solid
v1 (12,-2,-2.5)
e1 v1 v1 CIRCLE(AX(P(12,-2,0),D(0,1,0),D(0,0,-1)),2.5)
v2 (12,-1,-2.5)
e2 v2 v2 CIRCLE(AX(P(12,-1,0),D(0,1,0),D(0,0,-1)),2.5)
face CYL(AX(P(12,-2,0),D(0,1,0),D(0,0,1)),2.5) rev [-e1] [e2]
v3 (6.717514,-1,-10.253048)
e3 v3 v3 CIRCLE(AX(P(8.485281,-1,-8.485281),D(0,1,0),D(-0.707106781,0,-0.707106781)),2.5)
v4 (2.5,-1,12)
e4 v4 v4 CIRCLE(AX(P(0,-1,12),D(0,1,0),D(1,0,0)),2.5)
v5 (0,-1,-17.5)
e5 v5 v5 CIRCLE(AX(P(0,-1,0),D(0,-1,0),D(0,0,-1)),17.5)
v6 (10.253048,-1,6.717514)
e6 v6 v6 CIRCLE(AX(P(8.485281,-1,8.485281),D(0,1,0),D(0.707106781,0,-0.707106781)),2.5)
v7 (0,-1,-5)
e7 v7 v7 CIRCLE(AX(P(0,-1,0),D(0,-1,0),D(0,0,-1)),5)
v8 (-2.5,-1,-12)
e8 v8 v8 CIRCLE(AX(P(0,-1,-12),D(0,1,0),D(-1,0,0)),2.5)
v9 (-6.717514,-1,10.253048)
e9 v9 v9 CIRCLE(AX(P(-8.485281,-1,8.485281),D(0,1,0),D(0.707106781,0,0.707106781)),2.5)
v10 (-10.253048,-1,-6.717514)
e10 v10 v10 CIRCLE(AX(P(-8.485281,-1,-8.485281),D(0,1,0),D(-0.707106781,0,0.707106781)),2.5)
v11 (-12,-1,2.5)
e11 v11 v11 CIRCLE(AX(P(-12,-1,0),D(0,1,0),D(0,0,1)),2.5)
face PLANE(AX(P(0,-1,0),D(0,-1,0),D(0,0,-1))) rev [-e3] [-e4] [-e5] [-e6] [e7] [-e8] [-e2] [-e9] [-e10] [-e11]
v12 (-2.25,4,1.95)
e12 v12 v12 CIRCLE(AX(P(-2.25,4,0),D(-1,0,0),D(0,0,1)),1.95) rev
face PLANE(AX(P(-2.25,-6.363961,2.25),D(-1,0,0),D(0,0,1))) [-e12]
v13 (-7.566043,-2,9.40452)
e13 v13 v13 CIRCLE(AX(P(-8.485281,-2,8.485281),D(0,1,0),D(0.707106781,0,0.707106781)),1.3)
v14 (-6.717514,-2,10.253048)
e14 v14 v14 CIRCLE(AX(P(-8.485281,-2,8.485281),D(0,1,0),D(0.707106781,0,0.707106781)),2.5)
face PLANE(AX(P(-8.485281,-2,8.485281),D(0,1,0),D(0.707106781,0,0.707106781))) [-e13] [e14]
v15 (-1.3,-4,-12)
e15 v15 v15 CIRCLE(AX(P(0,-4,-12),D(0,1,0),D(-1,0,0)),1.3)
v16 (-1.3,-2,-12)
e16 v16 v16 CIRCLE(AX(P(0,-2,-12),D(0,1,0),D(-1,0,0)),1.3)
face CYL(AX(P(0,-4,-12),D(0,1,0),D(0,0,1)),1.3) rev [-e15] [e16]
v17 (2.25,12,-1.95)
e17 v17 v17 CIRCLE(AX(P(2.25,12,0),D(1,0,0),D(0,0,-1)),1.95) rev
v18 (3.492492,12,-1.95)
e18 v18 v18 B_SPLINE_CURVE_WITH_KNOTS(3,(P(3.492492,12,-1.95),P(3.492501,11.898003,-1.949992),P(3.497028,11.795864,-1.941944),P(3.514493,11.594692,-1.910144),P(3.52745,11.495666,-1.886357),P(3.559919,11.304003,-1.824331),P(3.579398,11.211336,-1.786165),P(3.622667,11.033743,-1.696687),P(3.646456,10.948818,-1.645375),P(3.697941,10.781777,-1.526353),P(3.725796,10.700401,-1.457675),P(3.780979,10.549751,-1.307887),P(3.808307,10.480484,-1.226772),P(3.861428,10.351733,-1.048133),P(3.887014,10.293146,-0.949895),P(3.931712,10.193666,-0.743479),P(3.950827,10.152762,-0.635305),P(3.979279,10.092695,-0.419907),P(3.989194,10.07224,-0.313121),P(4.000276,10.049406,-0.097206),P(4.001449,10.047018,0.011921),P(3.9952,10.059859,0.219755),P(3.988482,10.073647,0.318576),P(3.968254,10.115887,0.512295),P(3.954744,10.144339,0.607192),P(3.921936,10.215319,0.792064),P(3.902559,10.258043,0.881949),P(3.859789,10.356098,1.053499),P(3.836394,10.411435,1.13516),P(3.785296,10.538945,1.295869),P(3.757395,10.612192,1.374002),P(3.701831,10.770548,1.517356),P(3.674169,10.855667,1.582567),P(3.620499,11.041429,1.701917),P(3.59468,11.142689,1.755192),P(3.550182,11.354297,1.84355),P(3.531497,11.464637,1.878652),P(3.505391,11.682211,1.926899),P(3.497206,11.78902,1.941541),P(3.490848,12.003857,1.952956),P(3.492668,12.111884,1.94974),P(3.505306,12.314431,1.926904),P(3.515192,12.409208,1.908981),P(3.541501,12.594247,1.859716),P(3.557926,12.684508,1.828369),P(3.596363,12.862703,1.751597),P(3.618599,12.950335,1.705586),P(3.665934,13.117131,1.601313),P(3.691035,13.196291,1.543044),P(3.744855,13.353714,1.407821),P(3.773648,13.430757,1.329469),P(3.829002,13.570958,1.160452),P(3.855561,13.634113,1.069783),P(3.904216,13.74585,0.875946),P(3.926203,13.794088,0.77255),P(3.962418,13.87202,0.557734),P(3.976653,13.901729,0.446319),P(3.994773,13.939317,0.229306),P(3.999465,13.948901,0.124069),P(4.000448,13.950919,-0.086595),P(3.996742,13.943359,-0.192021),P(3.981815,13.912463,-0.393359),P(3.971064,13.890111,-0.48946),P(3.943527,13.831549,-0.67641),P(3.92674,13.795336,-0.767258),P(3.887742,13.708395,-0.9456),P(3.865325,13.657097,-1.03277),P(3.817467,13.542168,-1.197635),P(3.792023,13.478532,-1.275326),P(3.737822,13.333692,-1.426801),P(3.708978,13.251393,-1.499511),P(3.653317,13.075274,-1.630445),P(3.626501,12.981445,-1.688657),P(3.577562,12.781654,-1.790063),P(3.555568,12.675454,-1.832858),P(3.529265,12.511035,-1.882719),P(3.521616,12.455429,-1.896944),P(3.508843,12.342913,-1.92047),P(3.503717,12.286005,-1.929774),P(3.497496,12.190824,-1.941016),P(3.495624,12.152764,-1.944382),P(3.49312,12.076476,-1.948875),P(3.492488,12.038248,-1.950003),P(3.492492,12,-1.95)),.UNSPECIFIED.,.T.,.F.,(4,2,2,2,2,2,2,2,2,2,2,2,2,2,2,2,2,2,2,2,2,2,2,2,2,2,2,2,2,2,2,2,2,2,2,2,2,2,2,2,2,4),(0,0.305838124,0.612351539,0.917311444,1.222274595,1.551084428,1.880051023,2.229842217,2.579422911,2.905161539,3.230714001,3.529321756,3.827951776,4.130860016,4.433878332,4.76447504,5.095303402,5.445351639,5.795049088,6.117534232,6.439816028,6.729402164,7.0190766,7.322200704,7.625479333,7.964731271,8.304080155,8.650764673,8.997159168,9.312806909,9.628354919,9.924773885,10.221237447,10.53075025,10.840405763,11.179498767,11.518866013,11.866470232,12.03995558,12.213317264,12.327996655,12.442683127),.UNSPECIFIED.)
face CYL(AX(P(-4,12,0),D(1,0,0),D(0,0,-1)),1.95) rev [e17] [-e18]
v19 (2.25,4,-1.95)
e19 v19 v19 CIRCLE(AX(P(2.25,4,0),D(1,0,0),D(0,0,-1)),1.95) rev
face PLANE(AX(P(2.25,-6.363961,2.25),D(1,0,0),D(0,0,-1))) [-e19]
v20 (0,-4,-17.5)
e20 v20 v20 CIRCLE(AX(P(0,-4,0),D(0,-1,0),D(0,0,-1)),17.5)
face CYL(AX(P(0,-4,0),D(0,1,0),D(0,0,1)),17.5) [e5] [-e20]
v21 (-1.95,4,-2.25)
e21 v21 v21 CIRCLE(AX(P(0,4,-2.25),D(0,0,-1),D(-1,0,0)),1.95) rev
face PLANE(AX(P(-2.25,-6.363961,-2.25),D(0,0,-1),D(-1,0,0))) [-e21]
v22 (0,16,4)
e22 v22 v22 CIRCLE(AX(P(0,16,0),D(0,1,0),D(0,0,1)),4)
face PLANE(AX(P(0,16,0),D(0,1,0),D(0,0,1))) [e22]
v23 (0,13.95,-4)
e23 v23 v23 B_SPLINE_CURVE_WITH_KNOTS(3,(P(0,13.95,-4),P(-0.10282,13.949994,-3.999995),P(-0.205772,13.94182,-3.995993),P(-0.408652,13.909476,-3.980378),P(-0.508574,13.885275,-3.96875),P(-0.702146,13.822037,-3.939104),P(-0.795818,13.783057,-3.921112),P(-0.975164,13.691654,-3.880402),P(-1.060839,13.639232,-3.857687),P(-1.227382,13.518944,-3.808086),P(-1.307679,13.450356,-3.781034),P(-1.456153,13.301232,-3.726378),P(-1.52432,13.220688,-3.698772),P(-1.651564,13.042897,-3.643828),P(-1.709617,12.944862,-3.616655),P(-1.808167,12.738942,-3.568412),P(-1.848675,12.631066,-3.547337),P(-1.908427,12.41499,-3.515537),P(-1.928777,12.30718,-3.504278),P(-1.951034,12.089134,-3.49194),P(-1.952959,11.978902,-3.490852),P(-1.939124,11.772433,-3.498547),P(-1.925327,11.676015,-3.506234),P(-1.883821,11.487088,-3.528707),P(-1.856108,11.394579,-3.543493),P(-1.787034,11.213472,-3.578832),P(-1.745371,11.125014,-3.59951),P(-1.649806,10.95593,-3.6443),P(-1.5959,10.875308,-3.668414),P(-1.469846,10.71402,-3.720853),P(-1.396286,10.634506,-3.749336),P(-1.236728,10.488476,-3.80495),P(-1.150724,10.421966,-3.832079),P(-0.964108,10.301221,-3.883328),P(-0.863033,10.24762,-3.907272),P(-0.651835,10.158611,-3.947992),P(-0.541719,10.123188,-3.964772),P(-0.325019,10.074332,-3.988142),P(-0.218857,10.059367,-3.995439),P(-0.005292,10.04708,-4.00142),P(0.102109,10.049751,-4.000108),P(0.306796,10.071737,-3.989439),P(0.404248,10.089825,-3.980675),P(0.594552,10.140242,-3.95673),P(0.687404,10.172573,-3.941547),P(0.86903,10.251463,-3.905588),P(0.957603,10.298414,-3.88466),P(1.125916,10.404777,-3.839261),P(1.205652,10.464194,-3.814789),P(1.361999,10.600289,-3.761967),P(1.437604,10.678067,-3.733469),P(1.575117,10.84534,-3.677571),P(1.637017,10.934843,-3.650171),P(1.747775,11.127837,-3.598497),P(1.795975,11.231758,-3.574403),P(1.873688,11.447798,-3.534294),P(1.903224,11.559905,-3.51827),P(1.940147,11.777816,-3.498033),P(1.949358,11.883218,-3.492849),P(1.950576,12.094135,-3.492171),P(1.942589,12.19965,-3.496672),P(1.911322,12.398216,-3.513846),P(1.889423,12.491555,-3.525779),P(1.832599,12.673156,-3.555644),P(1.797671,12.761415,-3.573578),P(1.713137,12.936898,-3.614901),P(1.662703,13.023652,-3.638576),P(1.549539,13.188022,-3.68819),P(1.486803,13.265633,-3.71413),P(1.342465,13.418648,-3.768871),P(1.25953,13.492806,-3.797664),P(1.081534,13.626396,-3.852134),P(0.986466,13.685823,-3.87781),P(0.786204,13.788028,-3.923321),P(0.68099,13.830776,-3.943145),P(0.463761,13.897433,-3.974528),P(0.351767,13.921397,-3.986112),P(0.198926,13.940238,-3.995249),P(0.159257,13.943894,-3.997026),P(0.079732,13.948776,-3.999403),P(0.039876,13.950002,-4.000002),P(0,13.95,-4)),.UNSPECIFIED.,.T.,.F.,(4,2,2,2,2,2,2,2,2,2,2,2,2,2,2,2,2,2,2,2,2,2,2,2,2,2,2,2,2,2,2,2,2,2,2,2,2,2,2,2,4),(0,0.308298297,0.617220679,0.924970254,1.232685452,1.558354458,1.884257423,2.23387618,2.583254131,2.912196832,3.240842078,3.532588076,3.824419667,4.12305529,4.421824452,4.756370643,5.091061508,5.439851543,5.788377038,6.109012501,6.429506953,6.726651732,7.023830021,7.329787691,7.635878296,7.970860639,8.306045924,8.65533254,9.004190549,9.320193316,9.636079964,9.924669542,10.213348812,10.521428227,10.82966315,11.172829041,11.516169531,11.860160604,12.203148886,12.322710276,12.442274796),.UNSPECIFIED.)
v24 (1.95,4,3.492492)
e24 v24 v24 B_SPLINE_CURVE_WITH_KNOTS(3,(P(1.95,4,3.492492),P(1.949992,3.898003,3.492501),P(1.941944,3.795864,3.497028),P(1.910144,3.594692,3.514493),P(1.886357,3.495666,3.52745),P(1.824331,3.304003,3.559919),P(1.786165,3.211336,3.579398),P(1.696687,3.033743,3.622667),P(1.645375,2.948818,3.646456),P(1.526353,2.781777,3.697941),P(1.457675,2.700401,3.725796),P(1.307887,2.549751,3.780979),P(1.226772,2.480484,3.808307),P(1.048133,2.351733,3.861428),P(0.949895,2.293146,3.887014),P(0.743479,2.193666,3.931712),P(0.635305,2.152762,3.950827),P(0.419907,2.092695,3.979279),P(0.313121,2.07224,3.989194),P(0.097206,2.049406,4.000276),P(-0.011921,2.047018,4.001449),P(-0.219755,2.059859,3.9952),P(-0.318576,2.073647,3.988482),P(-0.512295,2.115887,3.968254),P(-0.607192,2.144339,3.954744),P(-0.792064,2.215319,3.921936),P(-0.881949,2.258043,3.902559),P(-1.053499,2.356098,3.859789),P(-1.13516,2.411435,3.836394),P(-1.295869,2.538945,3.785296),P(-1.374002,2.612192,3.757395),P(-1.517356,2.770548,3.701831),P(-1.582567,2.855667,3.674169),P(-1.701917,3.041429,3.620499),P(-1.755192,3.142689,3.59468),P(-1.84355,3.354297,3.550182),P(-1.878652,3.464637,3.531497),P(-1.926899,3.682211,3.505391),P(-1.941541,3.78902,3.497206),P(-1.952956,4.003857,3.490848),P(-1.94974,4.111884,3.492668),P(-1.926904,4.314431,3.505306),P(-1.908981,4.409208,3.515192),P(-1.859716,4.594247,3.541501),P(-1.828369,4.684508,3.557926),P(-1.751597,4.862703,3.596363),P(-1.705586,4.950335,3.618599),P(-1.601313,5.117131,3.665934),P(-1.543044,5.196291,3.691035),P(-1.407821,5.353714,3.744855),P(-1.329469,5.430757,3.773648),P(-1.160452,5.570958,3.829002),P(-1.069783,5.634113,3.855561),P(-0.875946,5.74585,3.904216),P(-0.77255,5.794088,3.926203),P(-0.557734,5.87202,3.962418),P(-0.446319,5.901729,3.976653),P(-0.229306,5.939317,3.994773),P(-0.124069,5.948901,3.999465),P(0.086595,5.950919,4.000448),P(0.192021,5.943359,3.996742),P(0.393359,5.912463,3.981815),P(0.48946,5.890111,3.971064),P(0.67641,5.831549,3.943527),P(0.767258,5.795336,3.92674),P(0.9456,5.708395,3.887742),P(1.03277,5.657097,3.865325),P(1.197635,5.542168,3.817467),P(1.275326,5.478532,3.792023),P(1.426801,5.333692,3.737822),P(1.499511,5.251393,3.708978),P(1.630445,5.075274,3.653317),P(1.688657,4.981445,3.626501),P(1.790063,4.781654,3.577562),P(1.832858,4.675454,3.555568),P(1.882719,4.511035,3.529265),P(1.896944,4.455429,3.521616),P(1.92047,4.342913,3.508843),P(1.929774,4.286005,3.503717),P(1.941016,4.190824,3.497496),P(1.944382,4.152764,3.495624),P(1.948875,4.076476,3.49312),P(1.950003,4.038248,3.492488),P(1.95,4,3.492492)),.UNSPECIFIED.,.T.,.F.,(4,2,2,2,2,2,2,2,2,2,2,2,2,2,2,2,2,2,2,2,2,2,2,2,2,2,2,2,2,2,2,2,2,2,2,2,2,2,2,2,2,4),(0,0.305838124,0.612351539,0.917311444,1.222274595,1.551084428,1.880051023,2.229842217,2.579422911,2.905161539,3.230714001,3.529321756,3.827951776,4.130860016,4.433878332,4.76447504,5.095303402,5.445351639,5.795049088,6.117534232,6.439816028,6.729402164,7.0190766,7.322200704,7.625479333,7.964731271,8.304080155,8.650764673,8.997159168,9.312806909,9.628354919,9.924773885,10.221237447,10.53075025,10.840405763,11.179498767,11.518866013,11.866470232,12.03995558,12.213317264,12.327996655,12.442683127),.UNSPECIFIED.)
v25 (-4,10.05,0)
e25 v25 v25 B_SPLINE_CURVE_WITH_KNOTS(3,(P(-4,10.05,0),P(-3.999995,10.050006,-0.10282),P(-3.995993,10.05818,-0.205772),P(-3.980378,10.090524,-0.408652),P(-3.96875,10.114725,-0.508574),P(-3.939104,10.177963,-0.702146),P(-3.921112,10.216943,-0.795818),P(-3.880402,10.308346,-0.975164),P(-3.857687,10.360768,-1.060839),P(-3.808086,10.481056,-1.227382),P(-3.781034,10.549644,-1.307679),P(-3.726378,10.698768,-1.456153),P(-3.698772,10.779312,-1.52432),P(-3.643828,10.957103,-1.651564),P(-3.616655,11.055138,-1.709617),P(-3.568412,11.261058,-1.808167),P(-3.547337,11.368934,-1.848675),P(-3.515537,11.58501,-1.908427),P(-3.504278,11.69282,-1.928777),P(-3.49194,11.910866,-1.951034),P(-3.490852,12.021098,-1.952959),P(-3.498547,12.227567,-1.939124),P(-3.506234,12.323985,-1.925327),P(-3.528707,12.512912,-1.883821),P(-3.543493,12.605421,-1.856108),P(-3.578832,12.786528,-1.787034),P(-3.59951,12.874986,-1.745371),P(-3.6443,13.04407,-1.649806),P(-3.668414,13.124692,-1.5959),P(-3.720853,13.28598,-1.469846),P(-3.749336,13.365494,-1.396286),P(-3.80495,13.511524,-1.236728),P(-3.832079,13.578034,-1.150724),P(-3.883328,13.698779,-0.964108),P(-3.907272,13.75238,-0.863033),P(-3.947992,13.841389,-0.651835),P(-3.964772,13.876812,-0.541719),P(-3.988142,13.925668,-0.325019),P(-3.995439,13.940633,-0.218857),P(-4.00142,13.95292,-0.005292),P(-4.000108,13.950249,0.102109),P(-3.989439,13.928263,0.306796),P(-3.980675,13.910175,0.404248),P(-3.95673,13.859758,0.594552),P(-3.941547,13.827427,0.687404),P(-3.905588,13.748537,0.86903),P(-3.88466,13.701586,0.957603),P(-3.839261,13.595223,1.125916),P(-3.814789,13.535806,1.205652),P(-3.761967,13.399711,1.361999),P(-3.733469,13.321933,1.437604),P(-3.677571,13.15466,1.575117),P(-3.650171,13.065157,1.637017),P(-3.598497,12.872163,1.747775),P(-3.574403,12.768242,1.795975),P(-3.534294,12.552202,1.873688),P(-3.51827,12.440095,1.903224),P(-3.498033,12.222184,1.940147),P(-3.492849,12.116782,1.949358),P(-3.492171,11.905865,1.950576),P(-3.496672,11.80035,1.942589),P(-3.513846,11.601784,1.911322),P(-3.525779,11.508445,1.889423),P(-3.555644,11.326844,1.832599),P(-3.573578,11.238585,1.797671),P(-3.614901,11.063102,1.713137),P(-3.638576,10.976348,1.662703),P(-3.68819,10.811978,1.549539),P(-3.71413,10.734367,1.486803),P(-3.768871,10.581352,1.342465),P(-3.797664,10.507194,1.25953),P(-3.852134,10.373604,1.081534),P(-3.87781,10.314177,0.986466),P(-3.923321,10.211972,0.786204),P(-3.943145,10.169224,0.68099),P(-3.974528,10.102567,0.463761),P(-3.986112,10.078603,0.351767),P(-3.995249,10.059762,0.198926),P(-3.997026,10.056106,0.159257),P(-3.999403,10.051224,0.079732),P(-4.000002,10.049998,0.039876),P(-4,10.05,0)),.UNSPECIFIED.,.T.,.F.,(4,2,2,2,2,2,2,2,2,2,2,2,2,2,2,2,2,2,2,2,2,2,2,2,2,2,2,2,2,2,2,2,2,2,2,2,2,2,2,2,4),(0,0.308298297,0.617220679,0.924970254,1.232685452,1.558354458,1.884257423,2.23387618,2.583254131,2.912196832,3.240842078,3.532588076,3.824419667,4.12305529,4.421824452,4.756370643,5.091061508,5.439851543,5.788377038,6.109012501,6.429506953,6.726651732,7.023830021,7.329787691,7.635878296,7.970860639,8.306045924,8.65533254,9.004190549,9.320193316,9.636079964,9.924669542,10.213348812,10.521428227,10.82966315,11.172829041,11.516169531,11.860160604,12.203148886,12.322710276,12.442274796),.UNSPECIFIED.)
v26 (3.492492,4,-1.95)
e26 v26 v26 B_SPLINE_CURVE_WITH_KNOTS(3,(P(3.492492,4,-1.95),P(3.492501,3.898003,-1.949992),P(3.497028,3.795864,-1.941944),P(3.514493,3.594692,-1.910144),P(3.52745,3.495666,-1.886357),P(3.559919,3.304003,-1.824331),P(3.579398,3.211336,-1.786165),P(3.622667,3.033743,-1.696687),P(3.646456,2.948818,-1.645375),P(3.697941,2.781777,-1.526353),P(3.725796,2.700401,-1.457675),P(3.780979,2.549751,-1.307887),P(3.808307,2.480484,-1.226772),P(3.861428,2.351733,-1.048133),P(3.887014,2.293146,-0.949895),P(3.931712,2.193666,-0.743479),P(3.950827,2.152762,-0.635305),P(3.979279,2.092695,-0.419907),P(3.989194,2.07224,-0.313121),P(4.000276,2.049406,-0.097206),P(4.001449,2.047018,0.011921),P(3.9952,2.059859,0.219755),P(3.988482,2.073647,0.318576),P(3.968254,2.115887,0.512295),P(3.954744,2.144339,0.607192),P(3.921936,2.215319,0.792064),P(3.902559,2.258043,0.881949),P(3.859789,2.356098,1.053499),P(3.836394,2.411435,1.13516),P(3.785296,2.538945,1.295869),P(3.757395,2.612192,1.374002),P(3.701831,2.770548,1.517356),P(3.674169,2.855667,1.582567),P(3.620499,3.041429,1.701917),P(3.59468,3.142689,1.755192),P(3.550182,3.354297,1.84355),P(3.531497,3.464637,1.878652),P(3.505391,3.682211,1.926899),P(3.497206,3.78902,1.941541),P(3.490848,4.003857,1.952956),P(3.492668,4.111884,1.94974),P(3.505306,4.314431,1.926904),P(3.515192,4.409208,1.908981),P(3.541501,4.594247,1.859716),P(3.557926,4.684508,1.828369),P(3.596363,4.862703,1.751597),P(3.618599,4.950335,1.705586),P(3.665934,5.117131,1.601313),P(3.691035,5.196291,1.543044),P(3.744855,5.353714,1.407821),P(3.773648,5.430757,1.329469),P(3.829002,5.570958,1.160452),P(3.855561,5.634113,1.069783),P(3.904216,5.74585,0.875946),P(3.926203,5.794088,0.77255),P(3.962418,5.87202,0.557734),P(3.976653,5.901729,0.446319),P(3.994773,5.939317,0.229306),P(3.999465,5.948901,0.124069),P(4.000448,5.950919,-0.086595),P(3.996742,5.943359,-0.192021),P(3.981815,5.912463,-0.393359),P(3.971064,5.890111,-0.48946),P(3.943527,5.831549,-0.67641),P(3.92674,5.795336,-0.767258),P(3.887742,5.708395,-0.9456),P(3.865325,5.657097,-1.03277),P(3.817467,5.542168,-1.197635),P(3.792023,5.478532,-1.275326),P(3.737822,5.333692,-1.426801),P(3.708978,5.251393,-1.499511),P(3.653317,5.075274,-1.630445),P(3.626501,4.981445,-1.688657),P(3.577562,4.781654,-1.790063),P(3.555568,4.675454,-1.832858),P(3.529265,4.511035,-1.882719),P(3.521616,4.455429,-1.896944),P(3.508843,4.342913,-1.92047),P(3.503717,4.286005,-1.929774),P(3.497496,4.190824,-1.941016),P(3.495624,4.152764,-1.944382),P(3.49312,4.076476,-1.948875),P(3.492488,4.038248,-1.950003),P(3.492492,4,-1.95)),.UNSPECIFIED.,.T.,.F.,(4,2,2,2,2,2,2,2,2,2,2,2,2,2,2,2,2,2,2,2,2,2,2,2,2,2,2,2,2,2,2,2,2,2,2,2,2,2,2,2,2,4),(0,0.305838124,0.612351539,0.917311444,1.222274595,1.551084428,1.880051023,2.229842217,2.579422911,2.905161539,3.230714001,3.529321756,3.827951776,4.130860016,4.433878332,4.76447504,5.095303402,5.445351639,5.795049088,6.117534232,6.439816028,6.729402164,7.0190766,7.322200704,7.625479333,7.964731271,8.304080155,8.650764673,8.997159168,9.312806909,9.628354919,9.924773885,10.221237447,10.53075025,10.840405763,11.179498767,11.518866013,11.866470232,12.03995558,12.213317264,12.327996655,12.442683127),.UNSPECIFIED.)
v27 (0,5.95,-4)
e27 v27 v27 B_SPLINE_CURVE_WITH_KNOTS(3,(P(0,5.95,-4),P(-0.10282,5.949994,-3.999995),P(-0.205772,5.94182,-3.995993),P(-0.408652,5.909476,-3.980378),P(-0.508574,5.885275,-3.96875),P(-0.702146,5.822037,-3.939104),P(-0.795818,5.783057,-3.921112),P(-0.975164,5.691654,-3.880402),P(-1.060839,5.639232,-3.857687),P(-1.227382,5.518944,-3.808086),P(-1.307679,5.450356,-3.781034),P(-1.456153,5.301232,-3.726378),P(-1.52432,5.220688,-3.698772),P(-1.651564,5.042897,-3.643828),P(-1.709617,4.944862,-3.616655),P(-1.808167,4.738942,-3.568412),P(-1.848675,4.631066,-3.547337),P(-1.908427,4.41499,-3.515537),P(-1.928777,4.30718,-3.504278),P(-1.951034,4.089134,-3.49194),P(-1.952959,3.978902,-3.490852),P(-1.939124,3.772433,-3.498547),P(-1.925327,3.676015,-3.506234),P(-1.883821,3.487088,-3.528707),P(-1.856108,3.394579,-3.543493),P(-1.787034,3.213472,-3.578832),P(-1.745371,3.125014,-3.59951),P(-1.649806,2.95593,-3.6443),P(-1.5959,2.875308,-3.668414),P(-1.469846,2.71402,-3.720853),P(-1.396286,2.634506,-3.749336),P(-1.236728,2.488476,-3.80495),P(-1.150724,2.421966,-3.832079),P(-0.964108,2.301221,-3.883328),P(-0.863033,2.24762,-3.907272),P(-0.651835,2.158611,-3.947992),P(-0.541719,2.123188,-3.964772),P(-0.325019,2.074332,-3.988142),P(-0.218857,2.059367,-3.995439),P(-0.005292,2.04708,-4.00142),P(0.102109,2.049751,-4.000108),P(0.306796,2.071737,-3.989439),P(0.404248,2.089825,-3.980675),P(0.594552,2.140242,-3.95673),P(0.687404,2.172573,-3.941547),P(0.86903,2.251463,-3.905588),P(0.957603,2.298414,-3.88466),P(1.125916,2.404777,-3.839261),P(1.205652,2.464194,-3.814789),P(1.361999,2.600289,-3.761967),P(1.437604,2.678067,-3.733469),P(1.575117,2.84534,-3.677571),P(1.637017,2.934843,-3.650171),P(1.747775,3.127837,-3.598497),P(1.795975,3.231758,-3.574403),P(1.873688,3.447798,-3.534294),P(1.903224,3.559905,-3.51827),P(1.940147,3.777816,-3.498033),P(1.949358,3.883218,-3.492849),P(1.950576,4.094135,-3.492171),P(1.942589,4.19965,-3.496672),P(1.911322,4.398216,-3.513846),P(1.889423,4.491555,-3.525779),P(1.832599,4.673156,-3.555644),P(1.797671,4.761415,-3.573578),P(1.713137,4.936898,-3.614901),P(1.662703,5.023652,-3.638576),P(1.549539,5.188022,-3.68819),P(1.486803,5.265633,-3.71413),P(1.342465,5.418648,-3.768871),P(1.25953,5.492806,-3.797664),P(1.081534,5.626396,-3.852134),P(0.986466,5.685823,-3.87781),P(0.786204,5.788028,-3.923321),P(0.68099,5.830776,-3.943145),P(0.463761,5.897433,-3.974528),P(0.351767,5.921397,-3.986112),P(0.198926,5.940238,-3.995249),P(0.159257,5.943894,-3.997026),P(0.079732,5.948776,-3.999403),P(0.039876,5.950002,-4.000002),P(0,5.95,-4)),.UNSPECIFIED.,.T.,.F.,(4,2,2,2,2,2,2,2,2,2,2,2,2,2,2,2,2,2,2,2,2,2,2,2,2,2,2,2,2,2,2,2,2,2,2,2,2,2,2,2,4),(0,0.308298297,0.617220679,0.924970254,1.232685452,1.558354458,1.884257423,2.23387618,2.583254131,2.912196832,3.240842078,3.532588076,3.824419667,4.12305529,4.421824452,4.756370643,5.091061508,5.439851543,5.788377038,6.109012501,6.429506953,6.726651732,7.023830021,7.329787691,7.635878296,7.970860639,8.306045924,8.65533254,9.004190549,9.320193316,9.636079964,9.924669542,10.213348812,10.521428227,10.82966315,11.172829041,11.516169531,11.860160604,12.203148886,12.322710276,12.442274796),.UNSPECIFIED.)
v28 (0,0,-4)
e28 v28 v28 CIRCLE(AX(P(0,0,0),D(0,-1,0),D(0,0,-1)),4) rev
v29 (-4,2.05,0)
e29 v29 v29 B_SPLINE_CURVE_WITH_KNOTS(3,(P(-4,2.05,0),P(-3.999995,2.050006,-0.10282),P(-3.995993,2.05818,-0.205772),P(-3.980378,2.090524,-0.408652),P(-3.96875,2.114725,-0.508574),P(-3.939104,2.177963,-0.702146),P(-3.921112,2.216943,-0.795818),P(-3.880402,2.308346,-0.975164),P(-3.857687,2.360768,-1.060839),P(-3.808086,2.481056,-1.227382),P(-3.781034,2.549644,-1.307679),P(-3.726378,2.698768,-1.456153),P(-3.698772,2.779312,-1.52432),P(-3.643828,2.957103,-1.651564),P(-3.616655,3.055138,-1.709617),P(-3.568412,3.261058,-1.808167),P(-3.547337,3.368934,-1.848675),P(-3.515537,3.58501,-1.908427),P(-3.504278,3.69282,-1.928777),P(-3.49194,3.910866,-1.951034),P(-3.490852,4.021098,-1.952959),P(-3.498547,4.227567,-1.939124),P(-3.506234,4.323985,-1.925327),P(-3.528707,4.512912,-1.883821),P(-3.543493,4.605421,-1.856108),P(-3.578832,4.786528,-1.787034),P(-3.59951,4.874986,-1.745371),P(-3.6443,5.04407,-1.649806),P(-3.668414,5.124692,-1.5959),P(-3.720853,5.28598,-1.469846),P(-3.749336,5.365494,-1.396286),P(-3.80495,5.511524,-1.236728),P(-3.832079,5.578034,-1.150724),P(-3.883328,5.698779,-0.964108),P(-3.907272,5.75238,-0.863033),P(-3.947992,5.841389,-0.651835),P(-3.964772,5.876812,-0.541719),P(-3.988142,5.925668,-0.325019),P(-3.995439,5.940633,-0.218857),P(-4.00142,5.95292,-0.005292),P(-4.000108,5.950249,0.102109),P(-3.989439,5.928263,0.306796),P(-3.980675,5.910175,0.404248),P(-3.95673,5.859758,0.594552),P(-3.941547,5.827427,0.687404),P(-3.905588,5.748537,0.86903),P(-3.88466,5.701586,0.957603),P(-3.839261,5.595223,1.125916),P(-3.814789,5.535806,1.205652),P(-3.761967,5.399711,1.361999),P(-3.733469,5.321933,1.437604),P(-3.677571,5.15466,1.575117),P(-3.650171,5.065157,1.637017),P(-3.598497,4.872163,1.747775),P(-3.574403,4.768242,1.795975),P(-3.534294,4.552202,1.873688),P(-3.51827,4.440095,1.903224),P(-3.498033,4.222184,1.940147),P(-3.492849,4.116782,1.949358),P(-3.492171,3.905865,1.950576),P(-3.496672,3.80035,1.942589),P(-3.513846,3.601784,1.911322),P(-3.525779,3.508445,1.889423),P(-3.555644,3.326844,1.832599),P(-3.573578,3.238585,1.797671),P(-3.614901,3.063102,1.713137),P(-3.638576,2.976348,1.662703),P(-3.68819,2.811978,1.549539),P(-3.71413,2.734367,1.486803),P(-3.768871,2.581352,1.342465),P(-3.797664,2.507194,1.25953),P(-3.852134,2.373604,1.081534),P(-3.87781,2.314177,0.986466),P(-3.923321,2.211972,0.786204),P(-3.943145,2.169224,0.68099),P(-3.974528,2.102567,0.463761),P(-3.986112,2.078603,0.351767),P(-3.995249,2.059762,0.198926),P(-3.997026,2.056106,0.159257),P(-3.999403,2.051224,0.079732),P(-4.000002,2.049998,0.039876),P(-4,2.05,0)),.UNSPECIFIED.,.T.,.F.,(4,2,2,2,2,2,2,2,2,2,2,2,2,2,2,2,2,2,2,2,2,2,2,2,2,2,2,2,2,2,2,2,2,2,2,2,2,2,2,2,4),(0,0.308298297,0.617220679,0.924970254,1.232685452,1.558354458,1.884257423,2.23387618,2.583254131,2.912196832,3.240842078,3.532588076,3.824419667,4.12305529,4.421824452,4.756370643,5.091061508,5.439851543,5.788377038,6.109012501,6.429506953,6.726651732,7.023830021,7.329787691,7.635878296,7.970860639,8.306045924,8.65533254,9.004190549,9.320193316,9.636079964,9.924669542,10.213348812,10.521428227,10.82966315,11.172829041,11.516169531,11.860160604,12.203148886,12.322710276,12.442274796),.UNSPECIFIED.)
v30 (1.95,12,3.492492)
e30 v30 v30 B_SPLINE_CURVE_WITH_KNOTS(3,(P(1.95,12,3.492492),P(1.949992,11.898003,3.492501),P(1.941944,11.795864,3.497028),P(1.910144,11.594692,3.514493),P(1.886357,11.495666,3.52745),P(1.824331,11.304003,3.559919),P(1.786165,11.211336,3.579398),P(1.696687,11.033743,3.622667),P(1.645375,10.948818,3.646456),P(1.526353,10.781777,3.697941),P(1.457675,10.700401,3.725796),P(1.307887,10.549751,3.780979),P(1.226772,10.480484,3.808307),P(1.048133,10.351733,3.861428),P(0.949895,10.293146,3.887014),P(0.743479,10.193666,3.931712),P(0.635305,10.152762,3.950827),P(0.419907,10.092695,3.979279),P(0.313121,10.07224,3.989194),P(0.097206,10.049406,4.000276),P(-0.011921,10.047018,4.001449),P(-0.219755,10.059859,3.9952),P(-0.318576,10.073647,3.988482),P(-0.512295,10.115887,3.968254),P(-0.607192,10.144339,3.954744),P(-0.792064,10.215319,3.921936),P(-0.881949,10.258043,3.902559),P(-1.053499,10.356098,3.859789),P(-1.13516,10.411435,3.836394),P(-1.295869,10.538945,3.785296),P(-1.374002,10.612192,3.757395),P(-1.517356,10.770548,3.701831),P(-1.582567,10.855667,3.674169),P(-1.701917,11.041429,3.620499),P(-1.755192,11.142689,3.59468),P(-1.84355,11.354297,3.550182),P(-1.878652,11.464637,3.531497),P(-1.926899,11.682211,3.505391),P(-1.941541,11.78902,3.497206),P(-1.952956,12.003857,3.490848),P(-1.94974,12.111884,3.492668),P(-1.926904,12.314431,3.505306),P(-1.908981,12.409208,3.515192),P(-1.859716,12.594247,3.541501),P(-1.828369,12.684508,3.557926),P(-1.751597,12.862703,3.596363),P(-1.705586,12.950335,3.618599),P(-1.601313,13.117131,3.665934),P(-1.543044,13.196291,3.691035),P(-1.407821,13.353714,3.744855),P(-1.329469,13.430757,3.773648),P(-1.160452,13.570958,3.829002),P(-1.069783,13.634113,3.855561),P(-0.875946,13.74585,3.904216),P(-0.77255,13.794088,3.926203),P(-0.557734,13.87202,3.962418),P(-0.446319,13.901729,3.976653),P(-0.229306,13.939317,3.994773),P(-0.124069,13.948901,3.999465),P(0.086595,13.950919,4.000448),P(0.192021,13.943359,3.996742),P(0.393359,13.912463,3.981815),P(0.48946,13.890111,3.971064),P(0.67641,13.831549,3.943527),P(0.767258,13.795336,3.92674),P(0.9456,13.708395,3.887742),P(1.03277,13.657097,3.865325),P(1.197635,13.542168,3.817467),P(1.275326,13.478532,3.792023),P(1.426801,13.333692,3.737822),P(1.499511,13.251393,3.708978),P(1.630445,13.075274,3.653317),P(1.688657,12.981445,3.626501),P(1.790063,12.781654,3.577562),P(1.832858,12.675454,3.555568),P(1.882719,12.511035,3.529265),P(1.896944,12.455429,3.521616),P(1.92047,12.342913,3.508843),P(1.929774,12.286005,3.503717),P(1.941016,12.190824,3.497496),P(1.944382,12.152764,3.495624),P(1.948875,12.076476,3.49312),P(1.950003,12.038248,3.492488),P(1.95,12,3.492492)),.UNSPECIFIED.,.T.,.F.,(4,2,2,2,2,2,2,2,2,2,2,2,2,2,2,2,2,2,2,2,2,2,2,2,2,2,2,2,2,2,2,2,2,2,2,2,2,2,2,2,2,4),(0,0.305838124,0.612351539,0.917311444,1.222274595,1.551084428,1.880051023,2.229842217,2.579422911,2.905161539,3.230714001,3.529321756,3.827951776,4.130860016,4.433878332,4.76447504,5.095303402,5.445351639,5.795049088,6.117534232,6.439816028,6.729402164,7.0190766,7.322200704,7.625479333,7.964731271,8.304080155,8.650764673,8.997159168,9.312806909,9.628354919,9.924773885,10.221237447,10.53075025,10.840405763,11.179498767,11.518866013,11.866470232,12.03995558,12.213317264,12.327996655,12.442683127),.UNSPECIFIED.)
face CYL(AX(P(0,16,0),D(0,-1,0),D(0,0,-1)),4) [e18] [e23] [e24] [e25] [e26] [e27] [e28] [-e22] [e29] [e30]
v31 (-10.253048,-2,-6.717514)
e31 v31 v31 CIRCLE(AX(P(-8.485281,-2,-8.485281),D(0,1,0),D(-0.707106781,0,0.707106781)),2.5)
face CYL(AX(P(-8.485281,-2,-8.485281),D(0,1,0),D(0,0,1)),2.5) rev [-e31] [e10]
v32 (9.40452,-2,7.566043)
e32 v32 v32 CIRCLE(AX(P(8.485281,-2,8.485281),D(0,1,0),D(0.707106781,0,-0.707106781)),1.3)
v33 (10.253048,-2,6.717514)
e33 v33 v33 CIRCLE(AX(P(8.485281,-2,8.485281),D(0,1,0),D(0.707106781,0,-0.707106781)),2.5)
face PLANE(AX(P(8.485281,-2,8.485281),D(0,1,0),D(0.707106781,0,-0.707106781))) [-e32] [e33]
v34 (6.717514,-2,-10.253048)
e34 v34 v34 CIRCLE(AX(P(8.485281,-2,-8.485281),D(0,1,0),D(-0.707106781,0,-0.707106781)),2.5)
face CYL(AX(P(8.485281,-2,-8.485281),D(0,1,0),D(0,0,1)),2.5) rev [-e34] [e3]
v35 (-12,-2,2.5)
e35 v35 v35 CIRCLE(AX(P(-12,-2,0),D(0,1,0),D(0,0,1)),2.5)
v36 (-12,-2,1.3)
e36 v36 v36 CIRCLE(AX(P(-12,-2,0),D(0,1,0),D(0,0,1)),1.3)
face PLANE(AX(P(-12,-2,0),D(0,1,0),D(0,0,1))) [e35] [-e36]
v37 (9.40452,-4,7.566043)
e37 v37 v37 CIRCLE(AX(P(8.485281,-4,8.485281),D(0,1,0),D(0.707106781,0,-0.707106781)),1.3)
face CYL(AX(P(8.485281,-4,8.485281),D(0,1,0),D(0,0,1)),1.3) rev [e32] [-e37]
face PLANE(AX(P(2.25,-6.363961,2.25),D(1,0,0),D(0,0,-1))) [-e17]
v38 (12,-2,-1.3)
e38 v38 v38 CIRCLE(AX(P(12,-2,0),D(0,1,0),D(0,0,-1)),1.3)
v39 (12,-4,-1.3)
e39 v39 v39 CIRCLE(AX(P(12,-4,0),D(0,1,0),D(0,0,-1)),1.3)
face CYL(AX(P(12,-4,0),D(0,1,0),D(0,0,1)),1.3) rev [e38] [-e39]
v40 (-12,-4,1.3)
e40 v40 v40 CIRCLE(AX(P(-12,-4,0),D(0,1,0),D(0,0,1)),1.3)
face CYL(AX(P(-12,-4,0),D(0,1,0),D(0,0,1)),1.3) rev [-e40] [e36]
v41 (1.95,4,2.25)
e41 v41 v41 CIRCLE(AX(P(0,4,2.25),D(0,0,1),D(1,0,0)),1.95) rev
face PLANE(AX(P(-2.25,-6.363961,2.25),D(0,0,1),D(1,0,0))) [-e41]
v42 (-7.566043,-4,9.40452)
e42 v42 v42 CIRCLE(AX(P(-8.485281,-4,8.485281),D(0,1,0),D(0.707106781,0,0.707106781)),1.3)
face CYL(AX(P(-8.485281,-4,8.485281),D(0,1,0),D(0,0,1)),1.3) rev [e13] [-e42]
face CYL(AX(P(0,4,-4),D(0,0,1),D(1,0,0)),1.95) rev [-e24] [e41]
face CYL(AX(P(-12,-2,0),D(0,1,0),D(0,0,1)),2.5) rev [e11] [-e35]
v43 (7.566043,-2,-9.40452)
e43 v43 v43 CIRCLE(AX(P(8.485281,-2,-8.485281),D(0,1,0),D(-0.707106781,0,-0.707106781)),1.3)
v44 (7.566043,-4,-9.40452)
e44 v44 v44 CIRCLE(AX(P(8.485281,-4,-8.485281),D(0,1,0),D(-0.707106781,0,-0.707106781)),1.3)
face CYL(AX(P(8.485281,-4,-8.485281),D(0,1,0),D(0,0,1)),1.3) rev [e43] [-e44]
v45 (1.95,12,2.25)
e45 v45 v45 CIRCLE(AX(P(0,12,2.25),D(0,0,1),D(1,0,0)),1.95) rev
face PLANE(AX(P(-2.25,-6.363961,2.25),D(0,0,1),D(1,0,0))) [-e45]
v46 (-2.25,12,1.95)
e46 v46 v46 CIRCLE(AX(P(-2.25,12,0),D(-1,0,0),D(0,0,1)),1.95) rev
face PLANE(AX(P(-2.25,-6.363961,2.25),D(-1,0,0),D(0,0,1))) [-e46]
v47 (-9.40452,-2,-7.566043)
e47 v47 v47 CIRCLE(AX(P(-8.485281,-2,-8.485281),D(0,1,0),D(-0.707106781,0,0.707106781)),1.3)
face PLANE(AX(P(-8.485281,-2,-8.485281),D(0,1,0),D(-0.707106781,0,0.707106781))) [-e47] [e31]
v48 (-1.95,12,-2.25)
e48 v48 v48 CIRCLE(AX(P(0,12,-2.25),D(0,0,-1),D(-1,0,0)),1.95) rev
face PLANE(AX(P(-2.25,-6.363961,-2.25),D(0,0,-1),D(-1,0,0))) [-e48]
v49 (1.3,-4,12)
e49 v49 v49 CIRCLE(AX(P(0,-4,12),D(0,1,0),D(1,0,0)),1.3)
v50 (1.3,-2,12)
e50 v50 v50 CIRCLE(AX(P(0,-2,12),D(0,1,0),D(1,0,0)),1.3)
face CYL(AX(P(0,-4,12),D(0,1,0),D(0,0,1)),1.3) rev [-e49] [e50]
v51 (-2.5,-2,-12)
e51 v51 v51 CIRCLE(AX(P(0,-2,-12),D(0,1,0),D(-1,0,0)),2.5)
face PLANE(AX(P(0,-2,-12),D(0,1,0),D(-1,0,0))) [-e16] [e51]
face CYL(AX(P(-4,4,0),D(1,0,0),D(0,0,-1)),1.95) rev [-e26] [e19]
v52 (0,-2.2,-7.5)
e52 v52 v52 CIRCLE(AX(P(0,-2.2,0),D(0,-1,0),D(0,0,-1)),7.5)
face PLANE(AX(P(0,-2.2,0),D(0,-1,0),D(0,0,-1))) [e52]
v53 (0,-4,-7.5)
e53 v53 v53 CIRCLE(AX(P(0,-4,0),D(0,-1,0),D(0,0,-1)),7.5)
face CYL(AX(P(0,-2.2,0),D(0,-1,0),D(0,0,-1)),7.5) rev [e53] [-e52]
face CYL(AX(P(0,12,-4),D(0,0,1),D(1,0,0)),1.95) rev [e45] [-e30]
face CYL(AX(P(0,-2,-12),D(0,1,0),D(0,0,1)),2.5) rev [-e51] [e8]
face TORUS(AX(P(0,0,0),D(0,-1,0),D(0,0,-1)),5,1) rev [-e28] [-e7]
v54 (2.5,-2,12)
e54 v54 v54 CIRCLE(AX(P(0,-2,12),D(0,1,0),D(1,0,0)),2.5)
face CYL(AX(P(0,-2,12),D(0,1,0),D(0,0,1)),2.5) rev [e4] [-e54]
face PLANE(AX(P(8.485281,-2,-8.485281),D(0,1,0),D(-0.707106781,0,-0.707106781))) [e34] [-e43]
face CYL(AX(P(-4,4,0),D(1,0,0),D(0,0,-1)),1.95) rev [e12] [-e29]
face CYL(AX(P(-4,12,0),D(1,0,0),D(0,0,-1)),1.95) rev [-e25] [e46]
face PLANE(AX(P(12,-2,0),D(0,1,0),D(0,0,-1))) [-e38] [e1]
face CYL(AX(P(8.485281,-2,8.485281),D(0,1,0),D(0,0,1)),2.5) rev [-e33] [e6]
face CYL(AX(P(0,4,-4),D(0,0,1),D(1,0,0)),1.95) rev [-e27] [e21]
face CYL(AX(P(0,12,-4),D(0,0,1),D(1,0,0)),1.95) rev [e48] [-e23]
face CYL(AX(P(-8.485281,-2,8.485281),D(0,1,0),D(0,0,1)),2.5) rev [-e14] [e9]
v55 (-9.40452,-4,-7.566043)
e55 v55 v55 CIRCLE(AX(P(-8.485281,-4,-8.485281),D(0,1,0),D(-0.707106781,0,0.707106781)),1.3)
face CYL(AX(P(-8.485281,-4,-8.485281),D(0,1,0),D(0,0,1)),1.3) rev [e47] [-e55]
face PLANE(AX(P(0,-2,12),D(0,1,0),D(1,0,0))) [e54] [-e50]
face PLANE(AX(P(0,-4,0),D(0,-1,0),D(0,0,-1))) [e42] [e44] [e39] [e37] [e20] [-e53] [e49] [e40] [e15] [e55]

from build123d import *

# Parameters (mm, degrees)
SKETCH_1_R               = 4
EXTRUDE_1_DEPTH          = 16
SKETCH_2_R               = 1.95
CUT_EXTRUDE_1_DEPTH      = 17.970562748
PATTERN_CIRCULAR_1_COUNT = 4
SKETCH_3_W               = 4.5
SKETCH_3_H               = 4.5
EXTRUDE_3_DEPTH          = 16
EXTRUDE_START            = 1
SKETCH_5_R               = 4
EXTRUDE_5_DEPTH          = 1
SKETCH_6_R               = 17.5
EXTRUDE_6_DEPTH          = 3
SKETCH_7_R               = 7.5
CUT_EXTRUDE_2_DEPTH      = 1.8
FILLET_1_R               = 1
SKETCH_8_R               = 1.3
CUT_EXTRUDE_3_DEPTH      = 31.024989649
SKETCH_9_R               = 2.5
SKETCH_9_R_2             = 1.3
CUT_EXTRUDE_4_DEPTH      = 1
PATTERN_CIRCULAR_2_COUNT = 8


with BuildPart() as part:
    # 草图1 → 凸台-拉伸1 (new body)
    with BuildSketch(Plane(origin=(0, 0, 0), x_dir=(1, 0, 0), z_dir=(0, 1, 0))):
        with Locations(Location((0, 0, 0), (0, 0, 270))):
            Circle(SKETCH_1_R)
    extrude(amount=EXTRUDE_1_DEPTH)

    # 草图2 → 切除-拉伸1 (cut, symmetric)
    with BuildSketch(Plane.XY):
        with Locations(Location((0, 12, 0), (0, 0, 90.000000018))):
            Circle(SKETCH_2_R)
        with Locations(Location((0, 4, 0), (0, 0, 90.000000018))):
            Circle(SKETCH_2_R)
    cut_extrude_1 = extrude(amount=CUT_EXTRUDE_1_DEPTH, both=True, mode=Mode.SUBTRACT)

    # 阵列(圆周)1: 切除-拉伸1 ×4 about axis
    pattern_circular_1_axis = Axis((0, 16, 0), (0, 1, 0))
    for i in range(1, PATTERN_CIRCULAR_1_COUNT):
        add(cut_extrude_1.rotate(pattern_circular_1_axis, i * 360 / PATTERN_CIRCULAR_1_COUNT), mode=Mode.SUBTRACT)



with BuildPart() as body_2:
    # 草图3 → 凸台-拉伸3 (new body)
    with BuildSketch(Plane(origin=(0, 16, 0), x_dir=(1, 0, 0), z_dir=(0, 1, 0))):
        Rectangle(SKETCH_3_W, SKETCH_3_H)
    extrude(amount=-EXTRUDE_3_DEPTH)


with BuildPart() as part_1:
    add(part.part)

    add(body_2.part)  # 凸台-拉伸5 merges body 2
    # 草图5 → 凸台-拉伸5 (add)
    with BuildSketch(Plane.XZ.offset(EXTRUDE_START)):
        with Locations(Location((0, 0, 0), (0, 0, 270))):
            Circle(SKETCH_5_R)
    extrude(amount=-EXTRUDE_5_DEPTH)

    # 草图6 → 凸台-拉伸6 (add)
    with BuildSketch(Plane.XZ.offset(1)):
        with Locations(Location((0, 0, 0), (0, 0, 270))):
            Circle(SKETCH_6_R)
    extrude(amount=EXTRUDE_6_DEPTH)

    # 草图7 → 切除-拉伸2 (cut)
    with BuildSketch(Plane.XZ.offset(4)):
        with Locations(Location((0, 0, 0), (0, 0, 270))):
            Circle(SKETCH_7_R)
    extrude(amount=-CUT_EXTRUDE_2_DEPTH, mode=Mode.SUBTRACT)

    # 圆角1
    fillet_1_edges = [part_1.edges().sort_by_distance(p)[0] for p in [
        (0, -1, 4),
    ]]
    fillet(fillet_1_edges, radius=FILLET_1_R - 0.0001)  # a hair under: the kernel refuses the full size

    # 草图8 → 切除-拉伸3 (cut, through all)
    with BuildSketch(Plane(origin=(0, -1, 0), x_dir=(1, 0, 0), z_dir=(0, 1, 0))):
        with Locations(Location((-12, 0, 0), (0, 0, 270))):
            Circle(SKETCH_8_R)
    cut_extrude_3 = extrude(amount=-CUT_EXTRUDE_3_DEPTH, mode=Mode.SUBTRACT)

    # 草图9 → 切除-拉伸4 (cut)
    with BuildSketch(Plane(origin=(0, -1, 0), x_dir=(1, 0, 0), z_dir=(0, 1, 0))):
        with Locations(Location((-12, 0, 0), (0, 0, 270))):
            Circle(SKETCH_9_R)
        with Locations(Location((-12, 0, 0), (0, 0, 270))):
            Circle(SKETCH_9_R_2, mode=Mode.SUBTRACT)
    cut_extrude_4 = extrude(amount=-CUT_EXTRUDE_4_DEPTH, mode=Mode.SUBTRACT)

    # 阵列(圆周)2: 切除-拉伸3, 切除-拉伸4 ×8 about axis
    pattern_circular_2_axis = Axis((0, 0, 0), (0, 1, 0))
    add([cut_extrude_3.rotate(pattern_circular_2_axis, i * 360 / PATTERN_CIRCULAR_2_COUNT) for i in range(1, PATTERN_CIRCULAR_2_COUNT)], mode=Mode.SUBTRACT)
    add([cut_extrude_4.rotate(pattern_circular_2_axis, i * 360 / PATTERN_CIRCULAR_2_COUNT) for i in range(1, PATTERN_CIRCULAR_2_COUNT)], mode=Mode.SUBTRACT)


solid = part_1.part
